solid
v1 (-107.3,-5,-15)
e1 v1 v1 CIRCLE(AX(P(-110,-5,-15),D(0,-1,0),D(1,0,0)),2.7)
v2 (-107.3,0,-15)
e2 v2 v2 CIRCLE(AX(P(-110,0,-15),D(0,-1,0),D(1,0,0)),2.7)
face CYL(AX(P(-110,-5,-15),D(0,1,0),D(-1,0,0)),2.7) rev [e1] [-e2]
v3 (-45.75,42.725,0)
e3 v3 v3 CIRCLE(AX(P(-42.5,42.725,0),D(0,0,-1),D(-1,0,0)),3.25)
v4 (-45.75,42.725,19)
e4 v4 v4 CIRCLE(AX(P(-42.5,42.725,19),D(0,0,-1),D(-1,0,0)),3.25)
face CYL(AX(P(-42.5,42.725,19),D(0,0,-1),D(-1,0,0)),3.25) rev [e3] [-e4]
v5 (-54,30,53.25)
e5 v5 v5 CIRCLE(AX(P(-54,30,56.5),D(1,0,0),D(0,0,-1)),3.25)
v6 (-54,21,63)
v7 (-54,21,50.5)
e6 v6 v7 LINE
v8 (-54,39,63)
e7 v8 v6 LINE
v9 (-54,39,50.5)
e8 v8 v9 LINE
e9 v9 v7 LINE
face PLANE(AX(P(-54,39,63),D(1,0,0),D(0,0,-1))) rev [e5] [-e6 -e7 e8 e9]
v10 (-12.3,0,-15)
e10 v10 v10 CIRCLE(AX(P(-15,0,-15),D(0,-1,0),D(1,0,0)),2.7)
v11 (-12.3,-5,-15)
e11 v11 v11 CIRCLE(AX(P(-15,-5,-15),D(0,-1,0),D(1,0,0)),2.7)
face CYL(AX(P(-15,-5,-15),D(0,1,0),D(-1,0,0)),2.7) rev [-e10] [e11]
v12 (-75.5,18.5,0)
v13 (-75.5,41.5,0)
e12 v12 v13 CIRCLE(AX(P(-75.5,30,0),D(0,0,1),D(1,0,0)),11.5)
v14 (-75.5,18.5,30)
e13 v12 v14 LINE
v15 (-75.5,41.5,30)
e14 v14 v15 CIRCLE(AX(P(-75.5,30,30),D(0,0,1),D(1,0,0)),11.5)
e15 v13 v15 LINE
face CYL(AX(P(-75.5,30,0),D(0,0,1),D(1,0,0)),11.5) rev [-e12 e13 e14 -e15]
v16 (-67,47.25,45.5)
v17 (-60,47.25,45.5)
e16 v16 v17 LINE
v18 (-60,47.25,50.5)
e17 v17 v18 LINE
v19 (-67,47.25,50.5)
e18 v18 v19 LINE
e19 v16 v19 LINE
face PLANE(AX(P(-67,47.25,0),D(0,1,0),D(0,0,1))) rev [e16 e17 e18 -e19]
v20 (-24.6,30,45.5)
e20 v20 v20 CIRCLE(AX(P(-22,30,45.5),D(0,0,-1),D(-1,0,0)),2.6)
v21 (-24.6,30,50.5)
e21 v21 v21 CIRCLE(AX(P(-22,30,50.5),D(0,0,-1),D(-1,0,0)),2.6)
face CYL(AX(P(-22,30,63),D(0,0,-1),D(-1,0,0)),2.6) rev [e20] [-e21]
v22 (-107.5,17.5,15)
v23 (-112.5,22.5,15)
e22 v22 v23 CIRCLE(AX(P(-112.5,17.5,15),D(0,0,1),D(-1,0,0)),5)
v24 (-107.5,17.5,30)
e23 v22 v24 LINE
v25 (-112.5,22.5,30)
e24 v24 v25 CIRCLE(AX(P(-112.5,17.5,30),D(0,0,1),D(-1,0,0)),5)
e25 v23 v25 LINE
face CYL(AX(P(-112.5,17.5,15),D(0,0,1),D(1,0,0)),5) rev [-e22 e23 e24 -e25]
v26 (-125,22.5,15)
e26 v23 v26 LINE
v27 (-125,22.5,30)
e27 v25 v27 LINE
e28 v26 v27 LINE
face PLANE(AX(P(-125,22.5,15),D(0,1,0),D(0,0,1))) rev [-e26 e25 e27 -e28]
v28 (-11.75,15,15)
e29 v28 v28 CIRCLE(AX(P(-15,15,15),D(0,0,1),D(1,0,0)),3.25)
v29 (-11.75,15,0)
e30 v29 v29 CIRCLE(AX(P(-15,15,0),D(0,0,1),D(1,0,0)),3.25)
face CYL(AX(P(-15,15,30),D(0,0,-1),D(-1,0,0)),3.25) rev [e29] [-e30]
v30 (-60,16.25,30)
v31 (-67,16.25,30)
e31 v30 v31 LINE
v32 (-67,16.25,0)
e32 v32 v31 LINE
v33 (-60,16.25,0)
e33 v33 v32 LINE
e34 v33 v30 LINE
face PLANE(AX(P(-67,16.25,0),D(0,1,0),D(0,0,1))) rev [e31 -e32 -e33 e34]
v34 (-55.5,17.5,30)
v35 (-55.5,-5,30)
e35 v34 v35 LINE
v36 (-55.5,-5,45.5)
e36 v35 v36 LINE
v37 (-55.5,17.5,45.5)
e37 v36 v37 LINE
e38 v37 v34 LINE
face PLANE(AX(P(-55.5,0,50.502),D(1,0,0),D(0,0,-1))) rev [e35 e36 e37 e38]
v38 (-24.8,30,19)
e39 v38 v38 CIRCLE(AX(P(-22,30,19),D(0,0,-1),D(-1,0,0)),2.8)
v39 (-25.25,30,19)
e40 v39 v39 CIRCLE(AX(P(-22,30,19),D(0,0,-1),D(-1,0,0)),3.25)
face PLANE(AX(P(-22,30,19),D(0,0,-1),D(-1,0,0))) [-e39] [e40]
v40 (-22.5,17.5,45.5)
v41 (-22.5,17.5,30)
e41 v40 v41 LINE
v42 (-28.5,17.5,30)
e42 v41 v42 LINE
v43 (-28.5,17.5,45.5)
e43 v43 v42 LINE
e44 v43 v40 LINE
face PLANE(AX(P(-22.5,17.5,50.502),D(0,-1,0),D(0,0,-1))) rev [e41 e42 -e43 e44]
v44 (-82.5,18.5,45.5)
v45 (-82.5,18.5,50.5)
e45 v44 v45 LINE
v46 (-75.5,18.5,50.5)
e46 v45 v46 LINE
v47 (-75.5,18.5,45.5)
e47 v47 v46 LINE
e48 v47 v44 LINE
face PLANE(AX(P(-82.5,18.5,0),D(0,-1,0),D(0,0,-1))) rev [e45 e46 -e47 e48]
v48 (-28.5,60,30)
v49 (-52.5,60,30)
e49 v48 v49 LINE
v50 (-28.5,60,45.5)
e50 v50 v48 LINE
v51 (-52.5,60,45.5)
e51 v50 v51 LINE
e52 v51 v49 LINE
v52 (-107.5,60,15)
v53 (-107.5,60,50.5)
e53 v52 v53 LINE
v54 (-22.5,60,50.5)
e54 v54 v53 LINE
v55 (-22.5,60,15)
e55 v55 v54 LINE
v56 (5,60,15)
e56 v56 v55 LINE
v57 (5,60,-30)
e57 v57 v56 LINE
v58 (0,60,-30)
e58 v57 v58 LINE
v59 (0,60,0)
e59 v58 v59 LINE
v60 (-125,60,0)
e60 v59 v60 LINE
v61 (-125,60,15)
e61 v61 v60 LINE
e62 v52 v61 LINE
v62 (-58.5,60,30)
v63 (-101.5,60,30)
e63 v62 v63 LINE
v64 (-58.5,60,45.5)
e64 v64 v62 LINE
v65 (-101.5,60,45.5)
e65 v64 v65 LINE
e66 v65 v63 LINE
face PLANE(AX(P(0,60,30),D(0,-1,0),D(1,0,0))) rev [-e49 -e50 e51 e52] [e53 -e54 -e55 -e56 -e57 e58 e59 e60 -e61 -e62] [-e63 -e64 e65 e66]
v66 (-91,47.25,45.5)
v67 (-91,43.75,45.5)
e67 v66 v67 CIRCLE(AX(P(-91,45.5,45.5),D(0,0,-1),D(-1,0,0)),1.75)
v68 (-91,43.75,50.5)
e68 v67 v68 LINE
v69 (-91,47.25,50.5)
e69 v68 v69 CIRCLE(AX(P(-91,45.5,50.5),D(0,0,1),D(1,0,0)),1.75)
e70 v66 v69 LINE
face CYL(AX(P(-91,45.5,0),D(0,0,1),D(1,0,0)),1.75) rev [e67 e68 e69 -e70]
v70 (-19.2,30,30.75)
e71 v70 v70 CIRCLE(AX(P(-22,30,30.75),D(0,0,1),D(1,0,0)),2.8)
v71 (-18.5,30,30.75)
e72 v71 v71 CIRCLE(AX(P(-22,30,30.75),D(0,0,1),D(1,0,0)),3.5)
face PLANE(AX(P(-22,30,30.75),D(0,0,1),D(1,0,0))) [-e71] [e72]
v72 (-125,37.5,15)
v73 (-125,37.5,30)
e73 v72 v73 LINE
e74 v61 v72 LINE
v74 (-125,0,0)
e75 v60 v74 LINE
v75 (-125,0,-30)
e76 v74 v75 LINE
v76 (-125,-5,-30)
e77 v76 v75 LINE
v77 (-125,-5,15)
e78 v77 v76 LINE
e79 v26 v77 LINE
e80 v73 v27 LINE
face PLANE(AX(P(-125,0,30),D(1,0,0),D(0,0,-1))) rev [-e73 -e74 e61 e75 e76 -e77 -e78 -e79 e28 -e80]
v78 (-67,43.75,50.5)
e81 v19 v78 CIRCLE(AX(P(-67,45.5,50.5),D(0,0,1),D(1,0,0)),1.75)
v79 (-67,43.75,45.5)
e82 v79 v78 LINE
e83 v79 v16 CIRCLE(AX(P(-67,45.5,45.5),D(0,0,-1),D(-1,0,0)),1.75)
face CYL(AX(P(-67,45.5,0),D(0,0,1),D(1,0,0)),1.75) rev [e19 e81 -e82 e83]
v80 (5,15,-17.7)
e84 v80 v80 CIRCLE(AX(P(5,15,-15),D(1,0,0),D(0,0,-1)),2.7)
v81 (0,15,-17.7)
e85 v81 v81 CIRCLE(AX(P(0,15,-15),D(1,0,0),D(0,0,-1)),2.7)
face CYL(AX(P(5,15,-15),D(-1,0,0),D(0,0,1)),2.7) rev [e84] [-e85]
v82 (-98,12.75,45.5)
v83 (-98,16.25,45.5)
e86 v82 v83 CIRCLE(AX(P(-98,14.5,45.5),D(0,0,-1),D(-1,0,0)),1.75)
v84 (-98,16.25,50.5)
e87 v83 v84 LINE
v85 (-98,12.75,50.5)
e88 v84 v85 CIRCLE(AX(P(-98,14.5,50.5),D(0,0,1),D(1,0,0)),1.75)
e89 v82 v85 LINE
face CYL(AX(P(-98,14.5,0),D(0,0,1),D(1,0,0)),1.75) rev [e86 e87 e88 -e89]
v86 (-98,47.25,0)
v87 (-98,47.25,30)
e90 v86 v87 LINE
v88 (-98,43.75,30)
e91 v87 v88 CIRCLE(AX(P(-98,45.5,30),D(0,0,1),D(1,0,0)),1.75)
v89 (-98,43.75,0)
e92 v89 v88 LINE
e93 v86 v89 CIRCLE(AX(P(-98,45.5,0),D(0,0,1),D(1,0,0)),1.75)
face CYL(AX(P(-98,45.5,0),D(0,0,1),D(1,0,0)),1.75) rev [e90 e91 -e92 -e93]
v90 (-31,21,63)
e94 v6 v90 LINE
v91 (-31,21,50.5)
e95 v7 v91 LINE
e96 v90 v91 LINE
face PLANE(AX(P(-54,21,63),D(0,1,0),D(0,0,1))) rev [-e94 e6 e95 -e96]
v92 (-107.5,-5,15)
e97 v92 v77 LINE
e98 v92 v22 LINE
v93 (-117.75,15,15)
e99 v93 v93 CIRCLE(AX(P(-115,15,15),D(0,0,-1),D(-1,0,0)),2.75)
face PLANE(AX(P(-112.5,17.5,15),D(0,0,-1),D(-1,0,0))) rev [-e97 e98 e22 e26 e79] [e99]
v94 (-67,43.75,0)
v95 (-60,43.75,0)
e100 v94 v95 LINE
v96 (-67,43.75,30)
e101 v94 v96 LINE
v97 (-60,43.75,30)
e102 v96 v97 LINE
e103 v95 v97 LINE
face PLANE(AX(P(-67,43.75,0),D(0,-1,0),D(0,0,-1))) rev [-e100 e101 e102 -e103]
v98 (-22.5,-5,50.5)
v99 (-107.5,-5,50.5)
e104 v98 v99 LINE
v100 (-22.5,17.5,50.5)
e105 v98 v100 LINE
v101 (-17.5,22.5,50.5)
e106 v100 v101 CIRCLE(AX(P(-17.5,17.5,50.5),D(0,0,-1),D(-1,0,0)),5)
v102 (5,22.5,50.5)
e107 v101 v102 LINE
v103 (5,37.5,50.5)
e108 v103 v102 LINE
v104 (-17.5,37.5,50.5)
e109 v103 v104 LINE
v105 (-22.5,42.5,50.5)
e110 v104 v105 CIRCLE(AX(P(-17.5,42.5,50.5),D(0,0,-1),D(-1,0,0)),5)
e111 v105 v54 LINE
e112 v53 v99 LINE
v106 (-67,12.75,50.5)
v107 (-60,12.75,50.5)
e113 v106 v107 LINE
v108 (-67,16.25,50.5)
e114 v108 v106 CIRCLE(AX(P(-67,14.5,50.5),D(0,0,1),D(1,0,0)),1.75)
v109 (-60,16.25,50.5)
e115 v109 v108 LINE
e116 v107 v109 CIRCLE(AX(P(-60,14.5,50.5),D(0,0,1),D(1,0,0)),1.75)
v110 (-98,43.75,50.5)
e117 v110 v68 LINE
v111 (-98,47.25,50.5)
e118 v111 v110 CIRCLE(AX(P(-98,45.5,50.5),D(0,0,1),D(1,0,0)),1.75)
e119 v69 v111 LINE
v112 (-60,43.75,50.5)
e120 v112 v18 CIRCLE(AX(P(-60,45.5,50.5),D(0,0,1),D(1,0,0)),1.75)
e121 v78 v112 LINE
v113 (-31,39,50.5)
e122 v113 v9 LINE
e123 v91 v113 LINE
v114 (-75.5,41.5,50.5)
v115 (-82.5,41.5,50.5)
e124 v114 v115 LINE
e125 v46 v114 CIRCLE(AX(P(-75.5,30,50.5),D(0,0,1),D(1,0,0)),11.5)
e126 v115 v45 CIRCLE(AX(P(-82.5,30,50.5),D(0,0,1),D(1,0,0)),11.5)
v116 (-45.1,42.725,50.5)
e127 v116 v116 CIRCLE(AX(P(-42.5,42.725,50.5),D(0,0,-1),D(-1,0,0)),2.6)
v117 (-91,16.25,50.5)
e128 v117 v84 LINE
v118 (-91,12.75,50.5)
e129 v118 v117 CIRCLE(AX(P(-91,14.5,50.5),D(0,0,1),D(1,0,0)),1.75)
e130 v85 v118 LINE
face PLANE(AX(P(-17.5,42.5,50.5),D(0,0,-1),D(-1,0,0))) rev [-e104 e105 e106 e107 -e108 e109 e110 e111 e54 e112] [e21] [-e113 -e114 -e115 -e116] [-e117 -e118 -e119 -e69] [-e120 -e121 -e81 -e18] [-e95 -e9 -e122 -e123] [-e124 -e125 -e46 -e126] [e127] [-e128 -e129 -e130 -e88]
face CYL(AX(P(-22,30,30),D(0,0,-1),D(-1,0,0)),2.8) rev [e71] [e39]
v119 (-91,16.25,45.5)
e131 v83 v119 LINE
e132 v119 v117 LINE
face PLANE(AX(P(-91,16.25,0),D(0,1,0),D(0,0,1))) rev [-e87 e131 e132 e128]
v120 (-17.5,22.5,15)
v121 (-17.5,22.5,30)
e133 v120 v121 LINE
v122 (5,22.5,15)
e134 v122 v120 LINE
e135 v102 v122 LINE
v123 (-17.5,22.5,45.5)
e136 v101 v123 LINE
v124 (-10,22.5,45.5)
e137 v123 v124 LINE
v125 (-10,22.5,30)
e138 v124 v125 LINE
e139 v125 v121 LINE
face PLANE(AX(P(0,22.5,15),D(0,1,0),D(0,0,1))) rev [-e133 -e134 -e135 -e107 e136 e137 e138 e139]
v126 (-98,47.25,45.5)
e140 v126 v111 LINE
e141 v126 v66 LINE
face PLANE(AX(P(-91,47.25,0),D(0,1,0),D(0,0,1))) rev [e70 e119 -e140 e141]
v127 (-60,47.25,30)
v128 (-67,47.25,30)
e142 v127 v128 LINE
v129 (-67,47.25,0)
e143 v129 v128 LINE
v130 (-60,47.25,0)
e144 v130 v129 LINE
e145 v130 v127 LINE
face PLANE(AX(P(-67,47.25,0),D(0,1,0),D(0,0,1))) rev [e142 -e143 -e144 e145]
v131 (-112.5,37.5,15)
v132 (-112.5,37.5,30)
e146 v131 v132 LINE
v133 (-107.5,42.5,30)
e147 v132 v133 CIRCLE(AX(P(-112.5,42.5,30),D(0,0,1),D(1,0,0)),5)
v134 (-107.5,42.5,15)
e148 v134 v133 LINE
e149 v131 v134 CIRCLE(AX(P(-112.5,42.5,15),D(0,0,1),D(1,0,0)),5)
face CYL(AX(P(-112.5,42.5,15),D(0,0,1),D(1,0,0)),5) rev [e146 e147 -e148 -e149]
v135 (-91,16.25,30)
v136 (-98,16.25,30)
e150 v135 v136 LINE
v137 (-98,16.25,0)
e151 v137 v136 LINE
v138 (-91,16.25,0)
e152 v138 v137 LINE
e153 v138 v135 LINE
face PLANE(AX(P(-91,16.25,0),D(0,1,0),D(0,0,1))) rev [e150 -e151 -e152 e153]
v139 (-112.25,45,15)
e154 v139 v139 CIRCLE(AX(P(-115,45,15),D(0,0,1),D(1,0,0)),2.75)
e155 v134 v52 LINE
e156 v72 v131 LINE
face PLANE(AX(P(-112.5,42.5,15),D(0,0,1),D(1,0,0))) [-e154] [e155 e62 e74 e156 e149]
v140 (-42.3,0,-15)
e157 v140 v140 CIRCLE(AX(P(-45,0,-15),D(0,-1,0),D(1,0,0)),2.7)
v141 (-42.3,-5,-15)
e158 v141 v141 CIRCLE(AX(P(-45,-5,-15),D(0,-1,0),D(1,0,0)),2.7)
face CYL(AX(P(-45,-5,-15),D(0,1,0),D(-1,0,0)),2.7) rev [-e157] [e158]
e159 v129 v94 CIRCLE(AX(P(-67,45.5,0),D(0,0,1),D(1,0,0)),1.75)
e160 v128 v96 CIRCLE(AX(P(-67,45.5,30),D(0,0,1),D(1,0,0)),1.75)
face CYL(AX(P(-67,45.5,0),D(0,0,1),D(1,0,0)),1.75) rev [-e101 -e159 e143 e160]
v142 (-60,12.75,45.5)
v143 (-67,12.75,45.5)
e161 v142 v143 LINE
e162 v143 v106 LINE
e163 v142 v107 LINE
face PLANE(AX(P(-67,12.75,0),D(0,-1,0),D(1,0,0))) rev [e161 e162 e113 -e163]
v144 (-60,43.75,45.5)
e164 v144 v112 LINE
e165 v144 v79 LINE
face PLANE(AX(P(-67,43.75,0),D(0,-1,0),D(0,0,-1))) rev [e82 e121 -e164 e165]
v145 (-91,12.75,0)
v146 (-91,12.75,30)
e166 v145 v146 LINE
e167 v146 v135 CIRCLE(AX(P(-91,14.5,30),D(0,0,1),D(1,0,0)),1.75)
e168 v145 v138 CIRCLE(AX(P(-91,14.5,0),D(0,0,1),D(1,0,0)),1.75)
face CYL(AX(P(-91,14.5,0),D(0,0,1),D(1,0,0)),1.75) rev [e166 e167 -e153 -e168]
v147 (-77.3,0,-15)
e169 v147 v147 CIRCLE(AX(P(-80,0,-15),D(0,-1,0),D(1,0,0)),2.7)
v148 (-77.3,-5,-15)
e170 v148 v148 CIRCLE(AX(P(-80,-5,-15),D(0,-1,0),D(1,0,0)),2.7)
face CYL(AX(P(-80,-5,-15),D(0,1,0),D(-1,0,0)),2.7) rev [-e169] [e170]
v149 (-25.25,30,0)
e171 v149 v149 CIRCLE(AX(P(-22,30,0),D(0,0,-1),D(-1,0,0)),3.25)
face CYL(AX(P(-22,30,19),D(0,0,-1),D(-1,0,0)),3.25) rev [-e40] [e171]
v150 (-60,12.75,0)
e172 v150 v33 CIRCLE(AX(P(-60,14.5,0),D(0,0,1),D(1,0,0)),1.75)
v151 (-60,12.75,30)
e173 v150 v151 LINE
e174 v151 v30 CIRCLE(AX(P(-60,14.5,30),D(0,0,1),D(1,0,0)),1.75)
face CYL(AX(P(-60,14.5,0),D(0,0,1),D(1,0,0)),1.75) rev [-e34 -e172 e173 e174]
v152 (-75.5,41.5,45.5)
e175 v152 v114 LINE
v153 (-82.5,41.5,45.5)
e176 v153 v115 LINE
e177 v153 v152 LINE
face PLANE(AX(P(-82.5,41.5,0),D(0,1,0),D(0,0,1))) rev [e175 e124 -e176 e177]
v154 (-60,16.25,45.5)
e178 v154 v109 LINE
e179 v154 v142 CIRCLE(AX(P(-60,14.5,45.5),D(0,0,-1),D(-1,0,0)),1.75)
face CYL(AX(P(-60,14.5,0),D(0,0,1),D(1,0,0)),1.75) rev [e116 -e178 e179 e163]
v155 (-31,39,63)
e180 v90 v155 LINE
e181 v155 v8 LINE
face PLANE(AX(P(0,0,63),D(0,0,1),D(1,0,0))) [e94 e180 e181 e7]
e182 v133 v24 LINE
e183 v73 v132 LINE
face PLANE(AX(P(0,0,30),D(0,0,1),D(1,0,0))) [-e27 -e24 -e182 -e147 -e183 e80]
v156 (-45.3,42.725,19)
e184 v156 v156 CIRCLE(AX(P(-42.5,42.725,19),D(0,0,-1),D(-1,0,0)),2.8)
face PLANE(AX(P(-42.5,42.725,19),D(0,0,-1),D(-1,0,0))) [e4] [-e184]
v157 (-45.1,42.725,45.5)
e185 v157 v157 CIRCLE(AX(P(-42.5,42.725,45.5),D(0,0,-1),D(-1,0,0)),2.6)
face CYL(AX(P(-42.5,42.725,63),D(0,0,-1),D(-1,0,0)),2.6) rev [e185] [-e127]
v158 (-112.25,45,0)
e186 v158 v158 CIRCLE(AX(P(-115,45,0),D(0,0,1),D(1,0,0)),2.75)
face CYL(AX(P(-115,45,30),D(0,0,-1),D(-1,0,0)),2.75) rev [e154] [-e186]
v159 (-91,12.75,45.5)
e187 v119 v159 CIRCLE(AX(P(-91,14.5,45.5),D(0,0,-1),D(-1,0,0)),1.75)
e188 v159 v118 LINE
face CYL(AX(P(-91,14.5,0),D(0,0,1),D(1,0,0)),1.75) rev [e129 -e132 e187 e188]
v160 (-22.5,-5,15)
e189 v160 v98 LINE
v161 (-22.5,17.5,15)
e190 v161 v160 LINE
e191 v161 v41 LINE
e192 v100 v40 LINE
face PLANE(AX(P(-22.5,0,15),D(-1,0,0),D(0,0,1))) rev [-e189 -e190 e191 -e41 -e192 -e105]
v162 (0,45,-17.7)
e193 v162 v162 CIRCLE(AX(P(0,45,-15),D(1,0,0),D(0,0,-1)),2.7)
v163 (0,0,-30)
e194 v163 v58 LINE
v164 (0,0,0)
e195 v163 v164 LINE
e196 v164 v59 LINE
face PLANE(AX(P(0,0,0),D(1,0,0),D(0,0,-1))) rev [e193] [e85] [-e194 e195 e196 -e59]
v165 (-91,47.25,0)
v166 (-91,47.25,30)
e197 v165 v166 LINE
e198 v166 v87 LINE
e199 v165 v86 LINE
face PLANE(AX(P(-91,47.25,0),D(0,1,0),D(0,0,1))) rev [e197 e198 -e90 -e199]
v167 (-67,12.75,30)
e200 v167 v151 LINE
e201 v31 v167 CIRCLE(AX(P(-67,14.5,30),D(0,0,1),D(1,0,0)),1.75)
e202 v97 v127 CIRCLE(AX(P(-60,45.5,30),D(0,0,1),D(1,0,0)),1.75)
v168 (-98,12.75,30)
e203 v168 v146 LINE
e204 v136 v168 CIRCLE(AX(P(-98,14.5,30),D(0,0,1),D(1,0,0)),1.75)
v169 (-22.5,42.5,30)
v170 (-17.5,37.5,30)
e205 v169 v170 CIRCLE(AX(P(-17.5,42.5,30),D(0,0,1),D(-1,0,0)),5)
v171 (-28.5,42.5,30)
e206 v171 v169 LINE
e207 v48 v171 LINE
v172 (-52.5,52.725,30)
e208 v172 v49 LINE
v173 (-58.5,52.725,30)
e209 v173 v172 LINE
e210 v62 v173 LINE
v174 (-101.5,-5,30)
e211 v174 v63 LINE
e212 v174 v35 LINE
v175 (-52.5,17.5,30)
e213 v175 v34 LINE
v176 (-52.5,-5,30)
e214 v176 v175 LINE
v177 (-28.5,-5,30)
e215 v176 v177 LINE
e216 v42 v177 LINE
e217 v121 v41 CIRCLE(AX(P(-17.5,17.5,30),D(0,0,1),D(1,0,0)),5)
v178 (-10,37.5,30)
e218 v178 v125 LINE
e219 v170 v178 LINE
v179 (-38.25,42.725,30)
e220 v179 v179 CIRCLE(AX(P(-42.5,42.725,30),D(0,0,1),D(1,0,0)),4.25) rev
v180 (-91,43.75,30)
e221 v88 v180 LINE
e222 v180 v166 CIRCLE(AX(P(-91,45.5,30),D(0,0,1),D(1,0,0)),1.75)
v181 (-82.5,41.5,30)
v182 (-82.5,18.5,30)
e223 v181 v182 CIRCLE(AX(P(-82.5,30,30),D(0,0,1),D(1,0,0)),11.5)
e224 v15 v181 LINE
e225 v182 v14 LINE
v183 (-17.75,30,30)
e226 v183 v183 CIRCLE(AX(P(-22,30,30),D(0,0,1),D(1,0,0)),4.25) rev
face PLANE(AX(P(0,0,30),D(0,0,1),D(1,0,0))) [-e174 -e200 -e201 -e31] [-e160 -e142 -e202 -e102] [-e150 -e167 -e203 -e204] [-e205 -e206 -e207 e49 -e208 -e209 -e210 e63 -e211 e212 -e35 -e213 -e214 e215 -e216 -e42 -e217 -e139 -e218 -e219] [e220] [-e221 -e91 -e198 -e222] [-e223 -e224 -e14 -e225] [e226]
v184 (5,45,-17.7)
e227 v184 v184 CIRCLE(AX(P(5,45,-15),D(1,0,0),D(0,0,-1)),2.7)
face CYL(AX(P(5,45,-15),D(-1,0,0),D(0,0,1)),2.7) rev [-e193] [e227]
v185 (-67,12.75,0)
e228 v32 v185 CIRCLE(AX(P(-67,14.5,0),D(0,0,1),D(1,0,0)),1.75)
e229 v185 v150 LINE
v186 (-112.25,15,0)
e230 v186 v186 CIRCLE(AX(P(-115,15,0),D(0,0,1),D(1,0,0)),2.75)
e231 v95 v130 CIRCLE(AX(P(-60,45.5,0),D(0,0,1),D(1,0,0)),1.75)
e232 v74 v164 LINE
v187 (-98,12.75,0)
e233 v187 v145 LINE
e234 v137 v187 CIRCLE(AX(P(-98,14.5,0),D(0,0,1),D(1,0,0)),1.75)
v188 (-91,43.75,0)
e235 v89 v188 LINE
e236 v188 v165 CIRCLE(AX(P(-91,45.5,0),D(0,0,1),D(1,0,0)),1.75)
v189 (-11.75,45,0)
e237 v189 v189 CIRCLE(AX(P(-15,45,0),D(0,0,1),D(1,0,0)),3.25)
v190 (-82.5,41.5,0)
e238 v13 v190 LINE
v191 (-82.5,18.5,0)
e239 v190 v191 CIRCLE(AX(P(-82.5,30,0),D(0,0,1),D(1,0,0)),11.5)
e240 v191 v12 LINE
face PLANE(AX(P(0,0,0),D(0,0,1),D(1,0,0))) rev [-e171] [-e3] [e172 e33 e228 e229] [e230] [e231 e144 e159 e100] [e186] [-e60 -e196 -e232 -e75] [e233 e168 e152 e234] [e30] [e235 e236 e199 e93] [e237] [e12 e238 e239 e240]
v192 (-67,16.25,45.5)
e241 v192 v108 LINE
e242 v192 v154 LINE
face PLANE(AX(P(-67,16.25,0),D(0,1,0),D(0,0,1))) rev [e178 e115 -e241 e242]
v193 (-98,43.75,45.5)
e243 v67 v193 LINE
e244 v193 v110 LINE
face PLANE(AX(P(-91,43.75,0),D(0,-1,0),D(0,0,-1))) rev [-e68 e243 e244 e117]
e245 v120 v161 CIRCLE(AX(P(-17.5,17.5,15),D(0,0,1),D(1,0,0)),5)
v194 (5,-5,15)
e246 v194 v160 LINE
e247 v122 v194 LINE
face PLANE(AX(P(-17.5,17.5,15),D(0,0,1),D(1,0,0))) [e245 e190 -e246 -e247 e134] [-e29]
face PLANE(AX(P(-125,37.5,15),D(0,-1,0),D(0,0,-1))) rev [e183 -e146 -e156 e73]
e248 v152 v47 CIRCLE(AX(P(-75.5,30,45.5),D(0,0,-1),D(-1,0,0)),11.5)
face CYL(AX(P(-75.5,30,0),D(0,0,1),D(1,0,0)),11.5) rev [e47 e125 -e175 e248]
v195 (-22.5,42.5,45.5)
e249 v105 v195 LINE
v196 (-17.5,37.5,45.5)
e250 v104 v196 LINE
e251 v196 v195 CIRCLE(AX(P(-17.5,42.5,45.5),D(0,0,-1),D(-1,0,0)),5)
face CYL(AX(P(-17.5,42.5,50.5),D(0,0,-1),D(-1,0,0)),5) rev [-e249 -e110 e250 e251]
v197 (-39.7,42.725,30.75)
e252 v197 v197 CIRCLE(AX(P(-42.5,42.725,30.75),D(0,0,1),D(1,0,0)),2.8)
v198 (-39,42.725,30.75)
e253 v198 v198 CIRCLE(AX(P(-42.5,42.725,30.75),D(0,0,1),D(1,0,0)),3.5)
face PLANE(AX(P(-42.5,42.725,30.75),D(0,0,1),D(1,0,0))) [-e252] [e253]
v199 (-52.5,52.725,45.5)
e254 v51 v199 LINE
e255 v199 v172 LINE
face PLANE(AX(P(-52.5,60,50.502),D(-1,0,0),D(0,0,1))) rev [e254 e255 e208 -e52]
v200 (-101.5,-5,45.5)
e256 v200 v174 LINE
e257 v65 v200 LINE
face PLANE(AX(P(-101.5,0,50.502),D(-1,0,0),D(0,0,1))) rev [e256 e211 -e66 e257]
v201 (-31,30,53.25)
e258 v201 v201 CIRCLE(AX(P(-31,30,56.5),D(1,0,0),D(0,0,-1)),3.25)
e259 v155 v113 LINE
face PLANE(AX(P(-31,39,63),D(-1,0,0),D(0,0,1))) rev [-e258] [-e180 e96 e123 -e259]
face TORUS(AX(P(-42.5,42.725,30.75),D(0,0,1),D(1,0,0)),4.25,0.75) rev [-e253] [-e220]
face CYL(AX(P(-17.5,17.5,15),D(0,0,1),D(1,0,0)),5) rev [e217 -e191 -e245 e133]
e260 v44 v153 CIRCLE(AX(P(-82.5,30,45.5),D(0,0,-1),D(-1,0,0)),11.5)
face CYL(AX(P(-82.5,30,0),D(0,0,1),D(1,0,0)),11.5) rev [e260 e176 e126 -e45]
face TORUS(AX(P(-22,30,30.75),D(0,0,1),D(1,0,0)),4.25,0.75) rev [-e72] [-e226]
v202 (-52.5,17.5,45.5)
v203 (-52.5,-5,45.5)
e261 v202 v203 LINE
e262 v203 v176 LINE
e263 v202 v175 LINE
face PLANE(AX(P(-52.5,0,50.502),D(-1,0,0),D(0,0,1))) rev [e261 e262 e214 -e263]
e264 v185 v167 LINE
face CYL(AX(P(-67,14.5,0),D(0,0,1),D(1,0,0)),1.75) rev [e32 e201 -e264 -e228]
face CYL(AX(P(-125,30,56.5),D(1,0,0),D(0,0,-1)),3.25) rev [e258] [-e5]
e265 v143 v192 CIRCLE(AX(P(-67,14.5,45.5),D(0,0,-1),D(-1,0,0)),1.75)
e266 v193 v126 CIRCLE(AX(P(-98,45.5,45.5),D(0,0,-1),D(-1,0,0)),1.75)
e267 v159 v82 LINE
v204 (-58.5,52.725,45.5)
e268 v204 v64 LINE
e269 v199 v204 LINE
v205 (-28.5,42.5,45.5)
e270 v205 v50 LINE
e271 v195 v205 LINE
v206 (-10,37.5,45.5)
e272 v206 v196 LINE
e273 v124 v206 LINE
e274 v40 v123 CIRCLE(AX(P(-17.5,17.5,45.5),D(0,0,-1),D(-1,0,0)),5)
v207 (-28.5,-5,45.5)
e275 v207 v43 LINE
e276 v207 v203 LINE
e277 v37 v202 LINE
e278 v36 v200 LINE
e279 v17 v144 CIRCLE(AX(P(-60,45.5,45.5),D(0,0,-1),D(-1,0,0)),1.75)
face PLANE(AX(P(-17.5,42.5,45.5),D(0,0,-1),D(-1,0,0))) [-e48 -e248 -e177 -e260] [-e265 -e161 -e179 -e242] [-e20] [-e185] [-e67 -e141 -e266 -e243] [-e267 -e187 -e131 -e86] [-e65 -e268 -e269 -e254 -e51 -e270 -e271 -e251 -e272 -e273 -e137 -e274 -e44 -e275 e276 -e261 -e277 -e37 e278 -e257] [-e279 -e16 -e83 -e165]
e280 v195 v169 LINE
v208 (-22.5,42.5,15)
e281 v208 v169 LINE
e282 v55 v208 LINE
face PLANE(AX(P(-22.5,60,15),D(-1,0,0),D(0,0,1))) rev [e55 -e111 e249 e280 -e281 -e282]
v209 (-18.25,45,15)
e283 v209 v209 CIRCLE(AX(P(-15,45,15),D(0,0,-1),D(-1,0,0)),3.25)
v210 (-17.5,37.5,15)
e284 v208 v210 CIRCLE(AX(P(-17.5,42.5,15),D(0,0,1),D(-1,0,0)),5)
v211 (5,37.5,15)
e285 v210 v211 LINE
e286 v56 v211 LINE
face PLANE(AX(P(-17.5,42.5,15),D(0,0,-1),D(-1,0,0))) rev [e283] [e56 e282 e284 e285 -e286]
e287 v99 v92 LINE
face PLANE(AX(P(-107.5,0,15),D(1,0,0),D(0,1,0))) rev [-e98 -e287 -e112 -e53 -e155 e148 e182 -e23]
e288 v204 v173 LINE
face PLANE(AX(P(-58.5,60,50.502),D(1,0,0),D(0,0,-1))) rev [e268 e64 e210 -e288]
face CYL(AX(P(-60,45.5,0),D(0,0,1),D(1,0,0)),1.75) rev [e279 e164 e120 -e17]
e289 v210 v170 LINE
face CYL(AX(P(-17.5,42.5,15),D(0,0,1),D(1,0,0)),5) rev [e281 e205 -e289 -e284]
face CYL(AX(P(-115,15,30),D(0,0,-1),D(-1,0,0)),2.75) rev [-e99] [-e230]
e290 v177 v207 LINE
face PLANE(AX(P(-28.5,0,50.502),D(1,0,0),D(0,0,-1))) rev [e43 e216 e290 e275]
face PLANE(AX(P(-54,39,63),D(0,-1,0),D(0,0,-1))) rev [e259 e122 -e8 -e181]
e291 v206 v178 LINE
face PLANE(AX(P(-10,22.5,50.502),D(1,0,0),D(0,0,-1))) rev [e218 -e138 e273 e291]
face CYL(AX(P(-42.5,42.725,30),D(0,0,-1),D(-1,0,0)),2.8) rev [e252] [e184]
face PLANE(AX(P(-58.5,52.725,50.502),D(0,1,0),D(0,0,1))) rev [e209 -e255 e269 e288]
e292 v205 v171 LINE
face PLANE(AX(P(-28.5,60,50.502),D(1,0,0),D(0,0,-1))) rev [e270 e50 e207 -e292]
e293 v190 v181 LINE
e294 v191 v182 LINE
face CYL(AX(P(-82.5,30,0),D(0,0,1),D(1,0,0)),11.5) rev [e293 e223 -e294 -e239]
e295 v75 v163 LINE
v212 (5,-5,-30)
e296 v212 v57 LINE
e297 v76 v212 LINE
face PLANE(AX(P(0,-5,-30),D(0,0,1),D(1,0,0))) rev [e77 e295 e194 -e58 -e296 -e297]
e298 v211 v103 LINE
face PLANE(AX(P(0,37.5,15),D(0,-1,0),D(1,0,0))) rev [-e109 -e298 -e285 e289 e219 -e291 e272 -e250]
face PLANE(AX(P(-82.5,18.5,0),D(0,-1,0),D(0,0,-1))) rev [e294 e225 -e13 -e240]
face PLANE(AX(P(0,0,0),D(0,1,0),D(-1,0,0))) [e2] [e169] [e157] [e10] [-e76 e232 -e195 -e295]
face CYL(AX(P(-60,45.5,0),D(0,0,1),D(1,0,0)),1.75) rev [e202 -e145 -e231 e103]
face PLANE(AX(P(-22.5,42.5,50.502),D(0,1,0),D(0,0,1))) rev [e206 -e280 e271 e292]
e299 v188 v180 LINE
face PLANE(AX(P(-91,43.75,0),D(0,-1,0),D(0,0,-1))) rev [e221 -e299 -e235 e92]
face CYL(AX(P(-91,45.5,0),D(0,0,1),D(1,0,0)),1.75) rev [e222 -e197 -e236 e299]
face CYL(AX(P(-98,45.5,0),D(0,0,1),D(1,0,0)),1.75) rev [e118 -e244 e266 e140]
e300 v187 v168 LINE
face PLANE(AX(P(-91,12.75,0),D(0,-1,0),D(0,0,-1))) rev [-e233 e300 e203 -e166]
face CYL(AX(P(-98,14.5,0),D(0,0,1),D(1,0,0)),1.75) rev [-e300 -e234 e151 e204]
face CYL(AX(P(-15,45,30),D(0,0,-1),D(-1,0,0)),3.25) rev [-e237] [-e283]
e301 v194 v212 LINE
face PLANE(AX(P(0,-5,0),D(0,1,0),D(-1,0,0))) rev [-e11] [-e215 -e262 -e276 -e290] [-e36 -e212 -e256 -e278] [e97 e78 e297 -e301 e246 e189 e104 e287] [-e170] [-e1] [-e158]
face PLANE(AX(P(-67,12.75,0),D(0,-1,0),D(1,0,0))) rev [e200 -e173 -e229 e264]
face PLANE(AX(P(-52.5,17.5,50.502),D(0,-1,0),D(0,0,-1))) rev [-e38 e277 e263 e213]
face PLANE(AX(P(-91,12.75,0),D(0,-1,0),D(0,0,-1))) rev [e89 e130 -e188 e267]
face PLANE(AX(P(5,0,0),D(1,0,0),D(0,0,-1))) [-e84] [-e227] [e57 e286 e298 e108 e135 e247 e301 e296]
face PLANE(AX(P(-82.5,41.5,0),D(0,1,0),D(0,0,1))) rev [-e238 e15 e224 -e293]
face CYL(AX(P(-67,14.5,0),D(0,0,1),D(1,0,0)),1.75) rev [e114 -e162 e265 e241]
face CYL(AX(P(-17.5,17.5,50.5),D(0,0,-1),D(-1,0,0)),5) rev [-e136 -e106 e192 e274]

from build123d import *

# Parameters (mm, degrees)
SKETCH1_W           = 125
SKETCH1_H           = 60
SKETCH1_R           = 2.8
SKETCH1_R_2         = 3.25
SKETCH1_R_3         = 2.75
BOSS_EXTRUDE1_DEPTH = 30
CUT_EXTRUDE1_DEPTH  = 15
SKETCH3_R           = 3.25
CUT_EXTRUDE2_DEPTH  = 19
BOSS_EXTRUDE2_DEPTH = 5
BOSS_EXTRUDE3_REACH = 143.863
SKETCH5_W           = 6
SKETCH5_H           = 60
SKETCH5_H_2         = 17.5
SKETCH5_H_3         = 7.275
SKETCH5_W_2         = 3
SKETCH5_W_3         = 10
SKETCH5_H_4         = 15
CUT_EXTRUDE3_DEPTH  = 148.564392724
SKETCH7_W           = 23
SKETCH7_H           = 18
BOSS_EXTRUDE4_DEPTH = 12.5
SKETCH8_R           = 3.25
CUT_EXTRUDE4_DEPTH  = 129.082004981
SKETCH9_R           = 2.7
SKETCH9_W           = 24
SKETCH9_H           = 15.5
SKETCH9_W_2         = 46
BOSS_EXTRUDE5_DEPTH = 5
SKETCH10_R          = 2.7
BOSS_EXTRUDE6_DEPTH = 5
SKETCH11_R          = 2.6
CUT_EXTRUDE5_DEPTH  = 158.877325794
SKETCH12_R          = 3.5
SKETCH12_R_2        = 2.8
BOSS_EXTRUDE7_DEPTH = 0.75
FILLET1_R           = 0.75


with BuildPart() as part:
    # Sketch1 → Boss-Extrude1 (new body)
    with BuildSketch(Plane.XY):
        with Locations((-62.5, 30)):
            Rectangle(SKETCH1_W, SKETCH1_H)
        with Locations((-42.5, 42.725)):
            Circle(SKETCH1_R, mode=Mode.SUBTRACT)
        with Locations((-22, 30)):
            Circle(SKETCH1_R, mode=Mode.SUBTRACT)
        with Locations((-15, 45)):
            Circle(SKETCH1_R_2, mode=Mode.SUBTRACT)
        with Locations((-15, 15)):
            Circle(SKETCH1_R_2, mode=Mode.SUBTRACT)
        with Locations((-115, 15)):
            Circle(SKETCH1_R_3, mode=Mode.SUBTRACT)
        with Locations((-115, 45)):
            Circle(SKETCH1_R_3, mode=Mode.SUBTRACT)
    extrude(amount=BOSS_EXTRUDE1_DEPTH)

    # Sketch2 → Cut-Extrude1 (cut)
    with BuildSketch(Plane.XY.offset(30)):
        with BuildLine():
            Line((0, 0), (-22.5, 0))
            Line((-22.5, 0), (-22.5, 17.5))
            ThreePointArc((-22.5, 17.5), (-21.035533906, 21.035533906), (-17.5, 22.5))
            Line((-17.5, 22.5), (0, 22.5))
            Line((0, 22.5), (0, 0))
        make_face()
        with BuildLine():
            Line((0, 60), (-22.5, 60))
            Line((-22.5, 60), (-22.5, 42.5))
            ThreePointArc((-22.5, 42.5), (-21.035533906, 38.964466094), (-17.5, 37.5))
            Line((-17.5, 37.5), (0, 37.5))
            Line((0, 37.5), (0, 60))
        make_face()
        with BuildLine():
            Line((-107.5, 60), (-107.5, 42.5))
            ThreePointArc((-107.5, 42.5), (-108.964466094, 38.964466094), (-112.5, 37.5))
            Line((-112.5, 37.5), (-125, 37.5))
            Line((-125, 37.5), (-125, 60))
            Line((-125, 60), (-107.5, 60))
        make_face()
        with BuildLine():
            Line((-125, 0), (-107.5, 0))
            Line((-107.5, 0), (-107.5, 17.5))
            ThreePointArc((-107.5, 17.5), (-108.964466094, 21.035533906), (-112.5, 22.5))
            Line((-112.5, 22.5), (-125, 22.5))
            Line((-125, 22.5), (-125, 0))
        make_face()
    extrude(amount=-CUT_EXTRUDE1_DEPTH, mode=Mode.SUBTRACT)

    # Sketch3 → Cut-Extrude2 (cut)
    with BuildSketch(Plane(origin=(0, 0, 0), x_dir=(-1, 0, 0), z_dir=(0, 0, -1))):
        with Locations((22, 30)):
            Circle(SKETCH3_R)
        with Locations((42.5, 42.725)):
            Circle(SKETCH3_R)
    extrude(amount=-CUT_EXTRUDE2_DEPTH, mode=Mode.SUBTRACT)


with BuildPart() as body_2:
    # Sketch4 → Boss-Extrude2 (new body)
    with BuildSketch(Plane.XY.offset(45.5)):
        with BuildLine():
            Line((-107.5, 60), (-107.5, 0))
            Line((-107.5, 0), (-22.5, 0))
            Line((-22.5, 0), (-22.5, 17.5))
            ThreePointArc((-22.5, 17.5), (-21.035533906, 21.035533906), (-17.5, 22.5))
            Line((-17.5, 22.5), (0, 22.5))
            Line((0, 22.5), (0, 37.5))
            Line((0, 37.5), (-17.5, 37.5))
            ThreePointArc((-17.5, 37.5), (-21.035533906, 38.964466094), (-22.5, 42.5))
            Line((-22.5, 42.5), (-22.5, 60))
            Line((-22.5, 60), (-107.5, 60))
        make_face()
    extrude(amount=BOSS_EXTRUDE2_DEPTH)

    # Sketch5 → Boss-Extrude3 (add, up to next)
    with BuildSketch(Plane.XY.offset(30), mode=Mode.PRIVATE) as boss_extrude3_sk1:
        with Locations((-104.5, 30)):
            Rectangle(SKETCH5_W, SKETCH5_H)
    boss_extrude3_tool1 = extrude(boss_extrude3_sk1.sketch, amount=BOSS_EXTRUDE3_REACH, mode=Mode.PRIVATE) - body_2.part
    # Sketch5 → Boss-Extrude3 (add, up to next)
    with BuildSketch(Plane.XY.offset(30), mode=Mode.PRIVATE) as boss_extrude3_sk2:
        with Locations((-25.5, 8.75)):
            Rectangle(SKETCH5_W, SKETCH5_H_2)
    boss_extrude3_tool2 = extrude(boss_extrude3_sk2.sketch, amount=BOSS_EXTRUDE3_REACH, mode=Mode.PRIVATE) - body_2.part
    # Sketch5 → Boss-Extrude3 (add, up to next)
    with BuildSketch(Plane.XY.offset(30), mode=Mode.PRIVATE) as boss_extrude3_sk3:
        with Locations((-25.5, 51.25)):
            Rectangle(SKETCH5_W, SKETCH5_H_2)
    boss_extrude3_tool3 = extrude(boss_extrude3_sk3.sketch, amount=BOSS_EXTRUDE3_REACH, mode=Mode.PRIVATE) - body_2.part
    # Sketch5 → Boss-Extrude3 (add, up to next)
    with BuildSketch(Plane.XY.offset(30), mode=Mode.PRIVATE) as boss_extrude3_sk4:
        with Locations((-55.5, 56.3625)):
            Rectangle(SKETCH5_W, SKETCH5_H_3)
    boss_extrude3_tool4 = extrude(boss_extrude3_sk4.sketch, amount=BOSS_EXTRUDE3_REACH, mode=Mode.PRIVATE) - body_2.part
    # Sketch5 → Boss-Extrude3 (add, up to next)
    with BuildSketch(Plane.XY.offset(30), mode=Mode.PRIVATE) as boss_extrude3_sk5:
        with Locations((-54, 8.75)):
            Rectangle(SKETCH5_W_2, SKETCH5_H_2)
    boss_extrude3_tool5 = extrude(boss_extrude3_sk5.sketch, amount=BOSS_EXTRUDE3_REACH, mode=Mode.PRIVATE) - body_2.part
    # Sketch5 → Boss-Extrude3 (add, up to next)
    with BuildSketch(Plane.XY.offset(30), mode=Mode.PRIVATE) as boss_extrude3_sk6:
        with Locations((-5, 30)):
            Rectangle(SKETCH5_W_3, SKETCH5_H_4)
    boss_extrude3_tool6 = extrude(boss_extrude3_sk6.sketch, amount=BOSS_EXTRUDE3_REACH, mode=Mode.PRIVATE) - body_2.part

    add(part.part)  # Boss-Extrude3 merges part
    add(boss_extrude3_tool1.solids().sort_by_distance((-104.5, 30, 30))[0])
    add(boss_extrude3_tool2.solids().sort_by_distance((-25.5, 8.75, 30))[0])
    add(boss_extrude3_tool3.solids().sort_by_distance((-25.5, 51.25, 30))[0])
    add(boss_extrude3_tool4.solids().sort_by_distance((-55.5, 56.3625, 30))[0])
    add(boss_extrude3_tool5.solids().sort_by_distance((-54, 8.75, 30))[0])
    add(boss_extrude3_tool6.solids().sort_by_distance((-5, 30, 30))[0])

    # Sketch6 → Cut-Extrude3 (cut, through all)
    with BuildSketch(Plane.XY.offset(50.5)):
        with BuildLine():
            Line((-82.5, 41.5), (-75.5, 41.5))
            ThreePointArc((-75.5, 41.5), (-64, 30), (-75.5, 18.5))
            Line((-75.5, 18.5), (-82.5, 18.5))
            ThreePointArc((-82.5, 18.5), (-94, 30), (-82.5, 41.5))
        make_face()
        with BuildLine():
            Line((-91, 43.75), (-98, 43.75))
            ThreePointArc((-98, 43.75), (-99.75, 45.5), (-98, 47.25))
            Line((-98, 47.25), (-91, 47.25))
            ThreePointArc((-91, 47.25), (-89.25, 45.5), (-91, 43.75))
        make_face()
        with BuildLine():
            Line((-67, 47.25), (-60, 47.25))
            ThreePointArc((-60, 47.25), (-58.25, 45.5), (-60, 43.75))
            Line((-60, 43.75), (-67, 43.75))
            ThreePointArc((-67, 43.75), (-68.75, 45.5), (-67, 47.25))
        make_face()
        with BuildLine():
            Line((-91, 12.75), (-98, 12.75))
            ThreePointArc((-98, 12.75), (-99.75, 14.5), (-98, 16.25))
            Line((-98, 16.25), (-91, 16.25))
            ThreePointArc((-91, 16.25), (-89.25, 14.5), (-91, 12.75))
        make_face()
        with BuildLine():
            Line((-67, 16.25), (-60, 16.25))
            ThreePointArc((-60, 16.25), (-58.25, 14.5), (-60, 12.75))
            Line((-60, 12.75), (-67, 12.75))
            ThreePointArc((-67, 12.75), (-68.75, 14.5), (-67, 16.25))
        make_face()
    extrude(amount=-CUT_EXTRUDE3_DEPTH, mode=Mode.SUBTRACT)

    # Sketch7 → Boss-Extrude4 (add)
    with BuildSketch(Plane.XY.offset(50.5)):
        with Locations((-42.5, 30)):
            Rectangle(SKETCH7_W, SKETCH7_H)
    extrude(amount=BOSS_EXTRUDE4_DEPTH)

    # Sketch8 → Cut-Extrude4 (cut, through all)
    with BuildSketch(Plane(origin=(-31, 0, 0), x_dir=(0, 0, -1), z_dir=(1, 0, 0))):
        with Locations((-56.5, 30)):
            Circle(SKETCH8_R)
    extrude(amount=-CUT_EXTRUDE4_DEPTH, mode=Mode.SUBTRACT)

    # Sketch9 → Boss-Extrude5 (add)
    with BuildSketch(Plane.XZ):
        Polygon((-125, 15), (-107.5, 15), (-107.5, 50.5), (-22.5, 50.5), (-22.5, 15), (0, 15), (0, -30), (-125, -30), align=None)
        with Locations((-110, -15)):
            Circle(SKETCH9_R, mode=Mode.SUBTRACT)
        with Locations((-80, -15)):
            Circle(SKETCH9_R, mode=Mode.SUBTRACT)
        with Locations((-45, -15)):
            Circle(SKETCH9_R, mode=Mode.SUBTRACT)
        with Locations((-15, -15)):
            Circle(SKETCH9_R, mode=Mode.SUBTRACT)
        with Locations((-40.5, 37.75)):
            Rectangle(SKETCH9_W, SKETCH9_H, mode=Mode.SUBTRACT)
        with Locations((-78.5, 37.75)):
            Rectangle(SKETCH9_W_2, SKETCH9_H, mode=Mode.SUBTRACT)
    extrude(amount=BOSS_EXTRUDE5_DEPTH)

    # Sketch10 → Boss-Extrude6 (add)
    with BuildSketch(Plane(origin=(0, 0, 0), x_dir=(0, 0, -1), z_dir=(1, 0, 0))):
        Polygon((-50.5, 37.5), (-50.5, 22.5), (-15, 22.5), (-15, -5), (30, -5), (30, 60), (-15, 60), (-15, 37.5), align=None)
        with Locations((15, 45)):
            Circle(SKETCH10_R, mode=Mode.SUBTRACT)
        with Locations((15, 15)):
            Circle(SKETCH10_R, mode=Mode.SUBTRACT)
    extrude(amount=BOSS_EXTRUDE6_DEPTH)

    # Sketch11 → Cut-Extrude5 (cut, through all)
    with BuildSketch(Plane(origin=(0, 0, 45.5), x_dir=(-1, 0, 0), z_dir=(0, 0, -1))):
        with Locations((42.5, 42.725)):
            Circle(SKETCH11_R)
        with Locations((22, 30)):
            Circle(SKETCH11_R)
    extrude(amount=-CUT_EXTRUDE5_DEPTH, mode=Mode.SUBTRACT)

    # Sketch12 → Boss-Extrude7 (add)
    # profile 1 of 2: a face of its own
    with BuildSketch(Plane.XY.offset(30)):
        with Locations((-22, 30)):
            Circle(SKETCH12_R)
        with Locations(Location((-22, 30, 0), (0, 0, 180))):
            Circle(SKETCH12_R_2, mode=Mode.SUBTRACT)
    # profile 2 of 2: a face of its own
    with BuildSketch(Plane.XY.offset(30)):
        with Locations((-42.5, 42.725)):
            Circle(SKETCH12_R)
        with Locations(Location((-42.5, 42.725, 0), (0, 0, 180))):
            Circle(SKETCH12_R_2, mode=Mode.SUBTRACT)
    extrude(amount=BOSS_EXTRUDE7_DEPTH)

    # Fillet1
    fillet1_edges = [body_2.edges().sort_by_distance(p)[0] for p in [
        (-25.5, 30, 30),
        (-46, 42.725, 30),
    ]]
    fillet(fillet1_edges, radius=FILLET1_R - 0.0001)  # a hair under: the kernel refuses the full size


solid = body_2.part
